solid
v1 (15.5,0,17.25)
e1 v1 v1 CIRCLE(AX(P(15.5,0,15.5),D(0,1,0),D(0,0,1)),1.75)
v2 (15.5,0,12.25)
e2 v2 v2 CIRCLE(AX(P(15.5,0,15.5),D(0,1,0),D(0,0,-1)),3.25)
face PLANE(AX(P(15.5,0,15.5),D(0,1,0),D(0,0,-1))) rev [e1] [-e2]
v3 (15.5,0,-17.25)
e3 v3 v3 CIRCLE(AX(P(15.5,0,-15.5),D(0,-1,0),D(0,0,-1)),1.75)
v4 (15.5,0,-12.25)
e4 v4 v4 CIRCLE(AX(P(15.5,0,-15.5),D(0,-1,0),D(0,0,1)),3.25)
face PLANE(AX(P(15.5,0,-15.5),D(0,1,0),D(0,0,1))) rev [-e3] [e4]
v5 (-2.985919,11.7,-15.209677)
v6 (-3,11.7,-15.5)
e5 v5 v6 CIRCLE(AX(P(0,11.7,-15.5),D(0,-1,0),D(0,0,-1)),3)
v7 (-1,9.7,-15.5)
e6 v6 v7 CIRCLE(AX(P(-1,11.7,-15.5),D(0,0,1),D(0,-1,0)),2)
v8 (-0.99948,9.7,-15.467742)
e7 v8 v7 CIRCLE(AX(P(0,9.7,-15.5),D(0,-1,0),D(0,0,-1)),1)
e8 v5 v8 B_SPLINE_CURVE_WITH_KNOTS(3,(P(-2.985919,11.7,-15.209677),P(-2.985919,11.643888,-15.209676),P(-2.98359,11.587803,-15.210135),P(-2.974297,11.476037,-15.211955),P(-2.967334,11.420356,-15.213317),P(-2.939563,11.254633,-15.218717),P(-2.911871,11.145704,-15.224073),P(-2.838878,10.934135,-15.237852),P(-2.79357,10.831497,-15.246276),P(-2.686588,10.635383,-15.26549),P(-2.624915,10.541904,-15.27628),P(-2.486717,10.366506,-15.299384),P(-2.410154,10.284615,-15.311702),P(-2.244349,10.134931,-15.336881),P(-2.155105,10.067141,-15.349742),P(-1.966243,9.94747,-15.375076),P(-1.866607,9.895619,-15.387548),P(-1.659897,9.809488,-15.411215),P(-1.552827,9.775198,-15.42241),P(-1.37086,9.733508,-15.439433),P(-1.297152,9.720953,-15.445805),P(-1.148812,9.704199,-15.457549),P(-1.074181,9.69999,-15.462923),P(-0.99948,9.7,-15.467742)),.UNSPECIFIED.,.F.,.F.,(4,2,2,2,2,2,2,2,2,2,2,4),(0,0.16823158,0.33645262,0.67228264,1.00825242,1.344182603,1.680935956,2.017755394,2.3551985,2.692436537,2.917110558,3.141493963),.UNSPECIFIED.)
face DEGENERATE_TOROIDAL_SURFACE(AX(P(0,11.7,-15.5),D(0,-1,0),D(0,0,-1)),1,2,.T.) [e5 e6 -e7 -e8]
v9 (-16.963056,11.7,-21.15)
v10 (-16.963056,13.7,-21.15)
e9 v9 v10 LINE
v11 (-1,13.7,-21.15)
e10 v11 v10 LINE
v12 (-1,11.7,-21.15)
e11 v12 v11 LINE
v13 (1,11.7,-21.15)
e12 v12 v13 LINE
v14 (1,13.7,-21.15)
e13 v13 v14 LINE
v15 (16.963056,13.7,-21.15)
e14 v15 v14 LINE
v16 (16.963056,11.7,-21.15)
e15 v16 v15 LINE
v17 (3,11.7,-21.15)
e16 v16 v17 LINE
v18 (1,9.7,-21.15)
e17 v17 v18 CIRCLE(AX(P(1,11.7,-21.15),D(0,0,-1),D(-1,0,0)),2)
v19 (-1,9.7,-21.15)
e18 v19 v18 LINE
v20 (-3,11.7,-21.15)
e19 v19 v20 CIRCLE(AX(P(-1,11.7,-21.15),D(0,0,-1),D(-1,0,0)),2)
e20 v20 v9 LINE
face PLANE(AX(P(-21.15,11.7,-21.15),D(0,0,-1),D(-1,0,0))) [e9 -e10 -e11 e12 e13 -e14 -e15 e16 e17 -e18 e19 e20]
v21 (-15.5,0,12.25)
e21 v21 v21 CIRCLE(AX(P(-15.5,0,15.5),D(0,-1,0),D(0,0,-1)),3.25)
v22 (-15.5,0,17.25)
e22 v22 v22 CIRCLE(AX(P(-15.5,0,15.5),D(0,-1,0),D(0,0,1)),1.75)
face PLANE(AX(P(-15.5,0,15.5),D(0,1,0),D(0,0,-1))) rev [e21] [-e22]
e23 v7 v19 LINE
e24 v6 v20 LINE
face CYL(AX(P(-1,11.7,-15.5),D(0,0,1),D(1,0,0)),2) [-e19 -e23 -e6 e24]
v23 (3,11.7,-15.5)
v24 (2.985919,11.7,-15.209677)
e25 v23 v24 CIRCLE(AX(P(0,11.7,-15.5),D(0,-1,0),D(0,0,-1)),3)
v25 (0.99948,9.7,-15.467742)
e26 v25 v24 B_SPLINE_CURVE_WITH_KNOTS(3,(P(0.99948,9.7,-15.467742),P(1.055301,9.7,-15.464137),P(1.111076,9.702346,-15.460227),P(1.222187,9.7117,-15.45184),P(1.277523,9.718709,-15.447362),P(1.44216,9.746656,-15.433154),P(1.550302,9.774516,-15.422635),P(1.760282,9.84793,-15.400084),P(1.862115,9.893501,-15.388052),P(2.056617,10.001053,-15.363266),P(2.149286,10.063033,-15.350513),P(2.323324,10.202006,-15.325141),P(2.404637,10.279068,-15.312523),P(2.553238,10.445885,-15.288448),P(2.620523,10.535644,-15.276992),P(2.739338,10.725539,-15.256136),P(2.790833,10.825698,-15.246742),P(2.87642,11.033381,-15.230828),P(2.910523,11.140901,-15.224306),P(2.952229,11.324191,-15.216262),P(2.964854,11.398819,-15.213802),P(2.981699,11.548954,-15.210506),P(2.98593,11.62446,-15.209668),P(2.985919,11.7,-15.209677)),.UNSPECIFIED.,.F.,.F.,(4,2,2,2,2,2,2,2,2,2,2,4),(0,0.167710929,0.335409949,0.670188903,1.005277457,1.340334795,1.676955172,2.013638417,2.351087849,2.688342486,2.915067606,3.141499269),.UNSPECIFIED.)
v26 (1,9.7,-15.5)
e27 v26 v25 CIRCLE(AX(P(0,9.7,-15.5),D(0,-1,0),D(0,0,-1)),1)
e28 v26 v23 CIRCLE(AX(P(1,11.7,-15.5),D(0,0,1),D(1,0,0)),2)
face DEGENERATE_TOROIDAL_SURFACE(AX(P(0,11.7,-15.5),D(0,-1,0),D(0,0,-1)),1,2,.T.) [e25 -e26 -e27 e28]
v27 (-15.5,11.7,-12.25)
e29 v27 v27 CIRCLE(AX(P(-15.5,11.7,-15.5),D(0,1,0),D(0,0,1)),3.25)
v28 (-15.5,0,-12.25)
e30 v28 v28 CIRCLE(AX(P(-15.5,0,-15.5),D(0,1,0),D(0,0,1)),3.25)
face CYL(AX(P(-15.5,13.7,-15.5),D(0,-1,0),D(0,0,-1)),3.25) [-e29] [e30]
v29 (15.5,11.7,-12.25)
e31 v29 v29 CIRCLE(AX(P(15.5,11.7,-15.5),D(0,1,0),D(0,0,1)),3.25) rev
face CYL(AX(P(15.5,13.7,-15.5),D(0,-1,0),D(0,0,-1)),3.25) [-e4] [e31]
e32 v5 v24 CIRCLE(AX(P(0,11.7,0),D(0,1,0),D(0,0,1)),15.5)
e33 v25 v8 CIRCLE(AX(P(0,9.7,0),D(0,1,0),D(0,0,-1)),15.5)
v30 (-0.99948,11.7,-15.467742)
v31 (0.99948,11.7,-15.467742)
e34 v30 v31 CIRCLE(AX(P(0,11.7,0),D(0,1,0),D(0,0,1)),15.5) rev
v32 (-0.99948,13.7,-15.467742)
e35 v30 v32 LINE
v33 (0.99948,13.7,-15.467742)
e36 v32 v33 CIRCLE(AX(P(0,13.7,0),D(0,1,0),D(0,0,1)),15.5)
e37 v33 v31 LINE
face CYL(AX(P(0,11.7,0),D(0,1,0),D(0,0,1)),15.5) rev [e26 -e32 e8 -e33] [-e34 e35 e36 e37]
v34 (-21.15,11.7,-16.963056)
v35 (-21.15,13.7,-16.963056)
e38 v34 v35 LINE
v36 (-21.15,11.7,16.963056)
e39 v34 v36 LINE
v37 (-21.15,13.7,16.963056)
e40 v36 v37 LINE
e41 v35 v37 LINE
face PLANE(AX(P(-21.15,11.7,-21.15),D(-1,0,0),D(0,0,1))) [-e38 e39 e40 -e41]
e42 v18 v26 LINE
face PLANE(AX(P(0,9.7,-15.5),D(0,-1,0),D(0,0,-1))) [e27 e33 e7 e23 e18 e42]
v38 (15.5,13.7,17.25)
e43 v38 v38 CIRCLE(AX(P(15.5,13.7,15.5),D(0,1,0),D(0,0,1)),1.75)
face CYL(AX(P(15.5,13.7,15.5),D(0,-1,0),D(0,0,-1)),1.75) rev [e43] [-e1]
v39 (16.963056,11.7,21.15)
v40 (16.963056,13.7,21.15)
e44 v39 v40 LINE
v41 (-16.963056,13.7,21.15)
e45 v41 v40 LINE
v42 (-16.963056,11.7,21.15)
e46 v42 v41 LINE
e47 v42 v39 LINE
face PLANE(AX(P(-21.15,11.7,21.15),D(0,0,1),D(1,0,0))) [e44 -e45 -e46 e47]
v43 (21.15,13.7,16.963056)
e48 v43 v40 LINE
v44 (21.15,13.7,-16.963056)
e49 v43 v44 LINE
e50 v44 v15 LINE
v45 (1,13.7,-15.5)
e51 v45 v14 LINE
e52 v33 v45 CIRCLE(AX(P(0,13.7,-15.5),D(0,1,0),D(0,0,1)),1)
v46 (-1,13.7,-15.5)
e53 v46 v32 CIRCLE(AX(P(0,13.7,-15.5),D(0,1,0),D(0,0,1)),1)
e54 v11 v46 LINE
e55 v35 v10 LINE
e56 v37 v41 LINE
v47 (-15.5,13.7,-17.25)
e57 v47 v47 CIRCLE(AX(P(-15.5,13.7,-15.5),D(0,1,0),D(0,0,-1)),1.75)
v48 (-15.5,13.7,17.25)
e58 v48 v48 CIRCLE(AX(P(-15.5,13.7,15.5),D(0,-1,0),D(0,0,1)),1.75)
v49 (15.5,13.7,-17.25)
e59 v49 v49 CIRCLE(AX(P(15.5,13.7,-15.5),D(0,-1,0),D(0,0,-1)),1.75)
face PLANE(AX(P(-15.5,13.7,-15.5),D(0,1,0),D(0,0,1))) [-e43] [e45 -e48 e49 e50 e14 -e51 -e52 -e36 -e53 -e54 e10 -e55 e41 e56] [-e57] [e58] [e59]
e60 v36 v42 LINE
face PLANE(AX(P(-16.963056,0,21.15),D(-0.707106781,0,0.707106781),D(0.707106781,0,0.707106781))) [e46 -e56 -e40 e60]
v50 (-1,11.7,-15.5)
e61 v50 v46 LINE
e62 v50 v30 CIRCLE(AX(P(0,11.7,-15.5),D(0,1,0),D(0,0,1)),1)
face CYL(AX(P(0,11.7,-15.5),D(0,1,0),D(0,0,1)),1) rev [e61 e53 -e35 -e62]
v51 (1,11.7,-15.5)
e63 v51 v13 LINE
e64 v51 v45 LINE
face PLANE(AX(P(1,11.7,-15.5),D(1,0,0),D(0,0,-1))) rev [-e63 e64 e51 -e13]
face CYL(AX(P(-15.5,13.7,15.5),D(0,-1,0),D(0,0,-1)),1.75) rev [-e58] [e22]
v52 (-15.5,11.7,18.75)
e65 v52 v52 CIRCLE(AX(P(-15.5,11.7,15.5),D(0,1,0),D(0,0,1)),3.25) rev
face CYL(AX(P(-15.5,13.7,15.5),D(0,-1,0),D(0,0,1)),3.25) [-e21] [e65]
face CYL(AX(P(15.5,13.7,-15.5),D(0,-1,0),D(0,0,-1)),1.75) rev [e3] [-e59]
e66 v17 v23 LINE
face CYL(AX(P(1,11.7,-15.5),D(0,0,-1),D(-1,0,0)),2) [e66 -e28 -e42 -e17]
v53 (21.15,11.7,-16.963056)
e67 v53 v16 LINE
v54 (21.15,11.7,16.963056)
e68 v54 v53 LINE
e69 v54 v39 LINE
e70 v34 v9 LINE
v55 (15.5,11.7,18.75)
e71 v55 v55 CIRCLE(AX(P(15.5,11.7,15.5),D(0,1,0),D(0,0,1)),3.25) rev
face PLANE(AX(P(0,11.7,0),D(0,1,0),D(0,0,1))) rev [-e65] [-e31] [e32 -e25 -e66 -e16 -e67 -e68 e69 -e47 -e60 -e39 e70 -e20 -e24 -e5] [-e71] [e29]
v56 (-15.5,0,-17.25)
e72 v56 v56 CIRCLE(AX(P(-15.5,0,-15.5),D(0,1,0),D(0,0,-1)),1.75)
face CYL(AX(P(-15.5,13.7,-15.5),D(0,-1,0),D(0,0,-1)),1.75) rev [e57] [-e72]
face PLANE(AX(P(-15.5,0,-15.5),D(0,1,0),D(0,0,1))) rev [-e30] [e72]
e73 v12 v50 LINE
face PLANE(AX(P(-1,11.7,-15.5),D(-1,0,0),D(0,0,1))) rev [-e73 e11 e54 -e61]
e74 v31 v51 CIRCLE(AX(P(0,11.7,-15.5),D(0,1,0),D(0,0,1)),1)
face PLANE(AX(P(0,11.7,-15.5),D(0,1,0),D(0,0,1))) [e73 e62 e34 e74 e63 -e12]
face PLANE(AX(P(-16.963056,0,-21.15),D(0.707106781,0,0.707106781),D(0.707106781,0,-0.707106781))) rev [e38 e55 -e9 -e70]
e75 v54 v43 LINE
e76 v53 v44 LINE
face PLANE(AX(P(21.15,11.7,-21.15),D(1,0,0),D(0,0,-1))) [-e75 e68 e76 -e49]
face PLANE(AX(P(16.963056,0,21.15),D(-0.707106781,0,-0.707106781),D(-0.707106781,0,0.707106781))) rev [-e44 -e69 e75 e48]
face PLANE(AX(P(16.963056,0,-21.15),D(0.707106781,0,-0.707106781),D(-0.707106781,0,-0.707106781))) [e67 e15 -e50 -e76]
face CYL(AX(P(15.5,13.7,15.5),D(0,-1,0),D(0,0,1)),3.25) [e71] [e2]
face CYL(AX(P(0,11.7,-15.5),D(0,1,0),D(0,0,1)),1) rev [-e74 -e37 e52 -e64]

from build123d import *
from build123d.topology import SkipClean

# Parameters (mm, degrees)
SKETCH1_R               = 3.25
BOSS_EXTRUDE1_DEPTH     = 13.7
SKETCH2_W               = 42.3
SKETCH2_H               = 42.3
SKETCH2_R               = 15.5
BOSS_EXTRUDE2_DEPTH     = 2
CUT_EXTRUDE1_DEPTH      = 33.898860163
SKETCH4_R               = 1.75
CUT_EXTRUDE2_DEPTH      = 33.898860163
MIRROR6_COPY_1_SKETCH_R = 1.75
MIRROR6_COPY_1_DEPTH    = 33.898860163
BOSS_EXTRUDE3_DEPTH     = 2
CUT_EXTRUDE3_DEPTH      = 2
FILLET1_R               = 2


with BuildPart() as part:
    # Sketch1 → Boss-Extrude1 (new body)
    with BuildSketch(Plane(origin=(0, 0, 0), x_dir=(1, 0, 0), z_dir=(0, 1, 0))):
        with Locations(Location((-15.5, 15.5, 0), (0, 0, 270))):
            Circle(SKETCH1_R)
    extrude(amount=BOSS_EXTRUDE1_DEPTH)


with BuildPart() as body_2:
    # Mirror2: mirrored copy
    add(part.part.mirror(Plane(origin=(0, 0, 0), x_dir=(0, 0, 1), z_dir=(1, 0, 0))))


with BuildPart() as body_3:
    # Mirror3: mirrored copy
    add(part.part.mirror(Plane.XY))


with BuildPart() as body_4:
    # Mirror3 2: mirrored copy
    add(body_2.part.mirror(Plane.XY))


with BuildPart() as part_1:
    add(part.part)

    add(body_2.part)  # Boss-Extrude2 merges body 2

    add(body_3.part)  # Boss-Extrude2 merges body 3

    add(body_4.part)  # Boss-Extrude2 merges body 4
    # Sketch2 → Boss-Extrude2 (add)
    with BuildSketch(Plane(origin=(0, 13.7, 0), x_dir=(1, 0, 0), z_dir=(0, 1, 0))):
        Rectangle(SKETCH2_W, SKETCH2_H)
        with Locations(Location((0, 0, 0), (0, 0, 270))):
            Circle(SKETCH2_R, mode=Mode.SUBTRACT)
    extrude(amount=-BOSS_EXTRUDE2_DEPTH)

    # Sketch3 → Cut-Extrude1 (cut, through all)
    with BuildSketch(Plane(origin=(0, 13.7, 0), x_dir=(1, 0, 0), z_dir=(0, 1, 0))):
        Polygon((-16.963055506, 21.15), (-21.15, 16.963055506), (-21.15, 21.15), align=None)
        Polygon((16.963055506, -21.15), (21.15, -16.963055506), (21.15, -21.15), align=None)
    cut_extrude1 = extrude(amount=-CUT_EXTRUDE1_DEPTH, mode=Mode.SUBTRACT)

    # Mirror4: Cut-Extrude1 across plane
    add(cut_extrude1.mirror(Plane.XY), mode=Mode.SUBTRACT)

    # Sketch4 → Cut-Extrude2 (cut, through all)
    with BuildSketch(Plane.XZ):
        with Locations(Location((15.5, -15.5, 0), (0, 0, 270))):
            Circle(SKETCH4_R)
    cut_extrude2 = extrude(amount=-CUT_EXTRUDE2_DEPTH, mode=Mode.SUBTRACT)

    # Mirror5: Cut-Extrude2 across plane
    add(cut_extrude2.mirror(Plane(origin=(0, 0, 0), x_dir=(0, 0, 1), z_dir=(1, 0, 0))), mode=Mode.SUBTRACT)

    # Mirror6: Cut-Extrude2 across plane
    add(cut_extrude2.mirror(Plane.XY), mode=Mode.SUBTRACT)

    # Mirror6 copy 1 sketch → Mirror6 copy 1 (cut, through all)
    with BuildSketch(Plane(origin=(0, 0, 0), x_dir=(-1, 0, 0), z_dir=(0, -1, 0))):
        with Locations(Location((15.5, -15.5, 0), (0, 0, 270))):
            Circle(MIRROR6_COPY_1_SKETCH_R)
    extrude(amount=-MIRROR6_COPY_1_DEPTH, mode=Mode.SUBTRACT)

    # Sketch6 → Boss-Extrude3 (add)
    with SkipClean():  # the faces are left unmerged after this step: merging them gives an invalid solid
        with BuildSketch(Plane.XZ.offset(-11.7)):
            with BuildLine():
                Line((-3, -21.15), (-3, -15.5))
                ThreePointArc((-3, -15.5), (-2.996477704, -15.354668076), (-2.985919088, -15.209677419))
                ThreePointArc((-2.985919088, -15.209677419), (0, -15.5), (2.985919088, -15.209677419))
                ThreePointArc((2.985919088, -15.209677419), (2.996477704, -15.354668076), (3, -15.5))
                Line((3, -15.5), (3, -21.15))
                Line((3, -21.15), (-3, -21.15))
            make_face()
        extrude(amount=BOSS_EXTRUDE3_DEPTH)

    # Sketch7 → Cut-Extrude3 (cut)
    with SkipClean():  # the faces are left unmerged after this step: merging them gives an invalid solid
        with BuildSketch(Plane(origin=(0, 13.7, 0), x_dir=(1, 0, 0), z_dir=(0, 1, 0))):
            with BuildLine():
                Line((-1, 15.5), (-1, 21.15))
                ThreePointArc((-1, 21.15), (0, 22.15), (1, 21.15))
                Line((1, 21.15), (1, 15.5))
                ThreePointArc((1, 15.5), (0, 14.5), (-1, 15.5))
            make_face()
        extrude(amount=-CUT_EXTRUDE3_DEPTH, mode=Mode.SUBTRACT)

    # Fillet1
    fillet1_edges = [part_1.edges().sort_by_distance(p)[0] for p in [
        (2.996477704, 9.7, -15.354668076),
        (-2.996477704, 9.7, -15.354668076),
        (3, 9.7, -18.325),
        (-3, 9.7, -18.325),
    ]]
    fillet(fillet1_edges, radius=FILLET1_R - 0.0001)  # a hair under: the kernel refuses the full size


solid = part_1.part
